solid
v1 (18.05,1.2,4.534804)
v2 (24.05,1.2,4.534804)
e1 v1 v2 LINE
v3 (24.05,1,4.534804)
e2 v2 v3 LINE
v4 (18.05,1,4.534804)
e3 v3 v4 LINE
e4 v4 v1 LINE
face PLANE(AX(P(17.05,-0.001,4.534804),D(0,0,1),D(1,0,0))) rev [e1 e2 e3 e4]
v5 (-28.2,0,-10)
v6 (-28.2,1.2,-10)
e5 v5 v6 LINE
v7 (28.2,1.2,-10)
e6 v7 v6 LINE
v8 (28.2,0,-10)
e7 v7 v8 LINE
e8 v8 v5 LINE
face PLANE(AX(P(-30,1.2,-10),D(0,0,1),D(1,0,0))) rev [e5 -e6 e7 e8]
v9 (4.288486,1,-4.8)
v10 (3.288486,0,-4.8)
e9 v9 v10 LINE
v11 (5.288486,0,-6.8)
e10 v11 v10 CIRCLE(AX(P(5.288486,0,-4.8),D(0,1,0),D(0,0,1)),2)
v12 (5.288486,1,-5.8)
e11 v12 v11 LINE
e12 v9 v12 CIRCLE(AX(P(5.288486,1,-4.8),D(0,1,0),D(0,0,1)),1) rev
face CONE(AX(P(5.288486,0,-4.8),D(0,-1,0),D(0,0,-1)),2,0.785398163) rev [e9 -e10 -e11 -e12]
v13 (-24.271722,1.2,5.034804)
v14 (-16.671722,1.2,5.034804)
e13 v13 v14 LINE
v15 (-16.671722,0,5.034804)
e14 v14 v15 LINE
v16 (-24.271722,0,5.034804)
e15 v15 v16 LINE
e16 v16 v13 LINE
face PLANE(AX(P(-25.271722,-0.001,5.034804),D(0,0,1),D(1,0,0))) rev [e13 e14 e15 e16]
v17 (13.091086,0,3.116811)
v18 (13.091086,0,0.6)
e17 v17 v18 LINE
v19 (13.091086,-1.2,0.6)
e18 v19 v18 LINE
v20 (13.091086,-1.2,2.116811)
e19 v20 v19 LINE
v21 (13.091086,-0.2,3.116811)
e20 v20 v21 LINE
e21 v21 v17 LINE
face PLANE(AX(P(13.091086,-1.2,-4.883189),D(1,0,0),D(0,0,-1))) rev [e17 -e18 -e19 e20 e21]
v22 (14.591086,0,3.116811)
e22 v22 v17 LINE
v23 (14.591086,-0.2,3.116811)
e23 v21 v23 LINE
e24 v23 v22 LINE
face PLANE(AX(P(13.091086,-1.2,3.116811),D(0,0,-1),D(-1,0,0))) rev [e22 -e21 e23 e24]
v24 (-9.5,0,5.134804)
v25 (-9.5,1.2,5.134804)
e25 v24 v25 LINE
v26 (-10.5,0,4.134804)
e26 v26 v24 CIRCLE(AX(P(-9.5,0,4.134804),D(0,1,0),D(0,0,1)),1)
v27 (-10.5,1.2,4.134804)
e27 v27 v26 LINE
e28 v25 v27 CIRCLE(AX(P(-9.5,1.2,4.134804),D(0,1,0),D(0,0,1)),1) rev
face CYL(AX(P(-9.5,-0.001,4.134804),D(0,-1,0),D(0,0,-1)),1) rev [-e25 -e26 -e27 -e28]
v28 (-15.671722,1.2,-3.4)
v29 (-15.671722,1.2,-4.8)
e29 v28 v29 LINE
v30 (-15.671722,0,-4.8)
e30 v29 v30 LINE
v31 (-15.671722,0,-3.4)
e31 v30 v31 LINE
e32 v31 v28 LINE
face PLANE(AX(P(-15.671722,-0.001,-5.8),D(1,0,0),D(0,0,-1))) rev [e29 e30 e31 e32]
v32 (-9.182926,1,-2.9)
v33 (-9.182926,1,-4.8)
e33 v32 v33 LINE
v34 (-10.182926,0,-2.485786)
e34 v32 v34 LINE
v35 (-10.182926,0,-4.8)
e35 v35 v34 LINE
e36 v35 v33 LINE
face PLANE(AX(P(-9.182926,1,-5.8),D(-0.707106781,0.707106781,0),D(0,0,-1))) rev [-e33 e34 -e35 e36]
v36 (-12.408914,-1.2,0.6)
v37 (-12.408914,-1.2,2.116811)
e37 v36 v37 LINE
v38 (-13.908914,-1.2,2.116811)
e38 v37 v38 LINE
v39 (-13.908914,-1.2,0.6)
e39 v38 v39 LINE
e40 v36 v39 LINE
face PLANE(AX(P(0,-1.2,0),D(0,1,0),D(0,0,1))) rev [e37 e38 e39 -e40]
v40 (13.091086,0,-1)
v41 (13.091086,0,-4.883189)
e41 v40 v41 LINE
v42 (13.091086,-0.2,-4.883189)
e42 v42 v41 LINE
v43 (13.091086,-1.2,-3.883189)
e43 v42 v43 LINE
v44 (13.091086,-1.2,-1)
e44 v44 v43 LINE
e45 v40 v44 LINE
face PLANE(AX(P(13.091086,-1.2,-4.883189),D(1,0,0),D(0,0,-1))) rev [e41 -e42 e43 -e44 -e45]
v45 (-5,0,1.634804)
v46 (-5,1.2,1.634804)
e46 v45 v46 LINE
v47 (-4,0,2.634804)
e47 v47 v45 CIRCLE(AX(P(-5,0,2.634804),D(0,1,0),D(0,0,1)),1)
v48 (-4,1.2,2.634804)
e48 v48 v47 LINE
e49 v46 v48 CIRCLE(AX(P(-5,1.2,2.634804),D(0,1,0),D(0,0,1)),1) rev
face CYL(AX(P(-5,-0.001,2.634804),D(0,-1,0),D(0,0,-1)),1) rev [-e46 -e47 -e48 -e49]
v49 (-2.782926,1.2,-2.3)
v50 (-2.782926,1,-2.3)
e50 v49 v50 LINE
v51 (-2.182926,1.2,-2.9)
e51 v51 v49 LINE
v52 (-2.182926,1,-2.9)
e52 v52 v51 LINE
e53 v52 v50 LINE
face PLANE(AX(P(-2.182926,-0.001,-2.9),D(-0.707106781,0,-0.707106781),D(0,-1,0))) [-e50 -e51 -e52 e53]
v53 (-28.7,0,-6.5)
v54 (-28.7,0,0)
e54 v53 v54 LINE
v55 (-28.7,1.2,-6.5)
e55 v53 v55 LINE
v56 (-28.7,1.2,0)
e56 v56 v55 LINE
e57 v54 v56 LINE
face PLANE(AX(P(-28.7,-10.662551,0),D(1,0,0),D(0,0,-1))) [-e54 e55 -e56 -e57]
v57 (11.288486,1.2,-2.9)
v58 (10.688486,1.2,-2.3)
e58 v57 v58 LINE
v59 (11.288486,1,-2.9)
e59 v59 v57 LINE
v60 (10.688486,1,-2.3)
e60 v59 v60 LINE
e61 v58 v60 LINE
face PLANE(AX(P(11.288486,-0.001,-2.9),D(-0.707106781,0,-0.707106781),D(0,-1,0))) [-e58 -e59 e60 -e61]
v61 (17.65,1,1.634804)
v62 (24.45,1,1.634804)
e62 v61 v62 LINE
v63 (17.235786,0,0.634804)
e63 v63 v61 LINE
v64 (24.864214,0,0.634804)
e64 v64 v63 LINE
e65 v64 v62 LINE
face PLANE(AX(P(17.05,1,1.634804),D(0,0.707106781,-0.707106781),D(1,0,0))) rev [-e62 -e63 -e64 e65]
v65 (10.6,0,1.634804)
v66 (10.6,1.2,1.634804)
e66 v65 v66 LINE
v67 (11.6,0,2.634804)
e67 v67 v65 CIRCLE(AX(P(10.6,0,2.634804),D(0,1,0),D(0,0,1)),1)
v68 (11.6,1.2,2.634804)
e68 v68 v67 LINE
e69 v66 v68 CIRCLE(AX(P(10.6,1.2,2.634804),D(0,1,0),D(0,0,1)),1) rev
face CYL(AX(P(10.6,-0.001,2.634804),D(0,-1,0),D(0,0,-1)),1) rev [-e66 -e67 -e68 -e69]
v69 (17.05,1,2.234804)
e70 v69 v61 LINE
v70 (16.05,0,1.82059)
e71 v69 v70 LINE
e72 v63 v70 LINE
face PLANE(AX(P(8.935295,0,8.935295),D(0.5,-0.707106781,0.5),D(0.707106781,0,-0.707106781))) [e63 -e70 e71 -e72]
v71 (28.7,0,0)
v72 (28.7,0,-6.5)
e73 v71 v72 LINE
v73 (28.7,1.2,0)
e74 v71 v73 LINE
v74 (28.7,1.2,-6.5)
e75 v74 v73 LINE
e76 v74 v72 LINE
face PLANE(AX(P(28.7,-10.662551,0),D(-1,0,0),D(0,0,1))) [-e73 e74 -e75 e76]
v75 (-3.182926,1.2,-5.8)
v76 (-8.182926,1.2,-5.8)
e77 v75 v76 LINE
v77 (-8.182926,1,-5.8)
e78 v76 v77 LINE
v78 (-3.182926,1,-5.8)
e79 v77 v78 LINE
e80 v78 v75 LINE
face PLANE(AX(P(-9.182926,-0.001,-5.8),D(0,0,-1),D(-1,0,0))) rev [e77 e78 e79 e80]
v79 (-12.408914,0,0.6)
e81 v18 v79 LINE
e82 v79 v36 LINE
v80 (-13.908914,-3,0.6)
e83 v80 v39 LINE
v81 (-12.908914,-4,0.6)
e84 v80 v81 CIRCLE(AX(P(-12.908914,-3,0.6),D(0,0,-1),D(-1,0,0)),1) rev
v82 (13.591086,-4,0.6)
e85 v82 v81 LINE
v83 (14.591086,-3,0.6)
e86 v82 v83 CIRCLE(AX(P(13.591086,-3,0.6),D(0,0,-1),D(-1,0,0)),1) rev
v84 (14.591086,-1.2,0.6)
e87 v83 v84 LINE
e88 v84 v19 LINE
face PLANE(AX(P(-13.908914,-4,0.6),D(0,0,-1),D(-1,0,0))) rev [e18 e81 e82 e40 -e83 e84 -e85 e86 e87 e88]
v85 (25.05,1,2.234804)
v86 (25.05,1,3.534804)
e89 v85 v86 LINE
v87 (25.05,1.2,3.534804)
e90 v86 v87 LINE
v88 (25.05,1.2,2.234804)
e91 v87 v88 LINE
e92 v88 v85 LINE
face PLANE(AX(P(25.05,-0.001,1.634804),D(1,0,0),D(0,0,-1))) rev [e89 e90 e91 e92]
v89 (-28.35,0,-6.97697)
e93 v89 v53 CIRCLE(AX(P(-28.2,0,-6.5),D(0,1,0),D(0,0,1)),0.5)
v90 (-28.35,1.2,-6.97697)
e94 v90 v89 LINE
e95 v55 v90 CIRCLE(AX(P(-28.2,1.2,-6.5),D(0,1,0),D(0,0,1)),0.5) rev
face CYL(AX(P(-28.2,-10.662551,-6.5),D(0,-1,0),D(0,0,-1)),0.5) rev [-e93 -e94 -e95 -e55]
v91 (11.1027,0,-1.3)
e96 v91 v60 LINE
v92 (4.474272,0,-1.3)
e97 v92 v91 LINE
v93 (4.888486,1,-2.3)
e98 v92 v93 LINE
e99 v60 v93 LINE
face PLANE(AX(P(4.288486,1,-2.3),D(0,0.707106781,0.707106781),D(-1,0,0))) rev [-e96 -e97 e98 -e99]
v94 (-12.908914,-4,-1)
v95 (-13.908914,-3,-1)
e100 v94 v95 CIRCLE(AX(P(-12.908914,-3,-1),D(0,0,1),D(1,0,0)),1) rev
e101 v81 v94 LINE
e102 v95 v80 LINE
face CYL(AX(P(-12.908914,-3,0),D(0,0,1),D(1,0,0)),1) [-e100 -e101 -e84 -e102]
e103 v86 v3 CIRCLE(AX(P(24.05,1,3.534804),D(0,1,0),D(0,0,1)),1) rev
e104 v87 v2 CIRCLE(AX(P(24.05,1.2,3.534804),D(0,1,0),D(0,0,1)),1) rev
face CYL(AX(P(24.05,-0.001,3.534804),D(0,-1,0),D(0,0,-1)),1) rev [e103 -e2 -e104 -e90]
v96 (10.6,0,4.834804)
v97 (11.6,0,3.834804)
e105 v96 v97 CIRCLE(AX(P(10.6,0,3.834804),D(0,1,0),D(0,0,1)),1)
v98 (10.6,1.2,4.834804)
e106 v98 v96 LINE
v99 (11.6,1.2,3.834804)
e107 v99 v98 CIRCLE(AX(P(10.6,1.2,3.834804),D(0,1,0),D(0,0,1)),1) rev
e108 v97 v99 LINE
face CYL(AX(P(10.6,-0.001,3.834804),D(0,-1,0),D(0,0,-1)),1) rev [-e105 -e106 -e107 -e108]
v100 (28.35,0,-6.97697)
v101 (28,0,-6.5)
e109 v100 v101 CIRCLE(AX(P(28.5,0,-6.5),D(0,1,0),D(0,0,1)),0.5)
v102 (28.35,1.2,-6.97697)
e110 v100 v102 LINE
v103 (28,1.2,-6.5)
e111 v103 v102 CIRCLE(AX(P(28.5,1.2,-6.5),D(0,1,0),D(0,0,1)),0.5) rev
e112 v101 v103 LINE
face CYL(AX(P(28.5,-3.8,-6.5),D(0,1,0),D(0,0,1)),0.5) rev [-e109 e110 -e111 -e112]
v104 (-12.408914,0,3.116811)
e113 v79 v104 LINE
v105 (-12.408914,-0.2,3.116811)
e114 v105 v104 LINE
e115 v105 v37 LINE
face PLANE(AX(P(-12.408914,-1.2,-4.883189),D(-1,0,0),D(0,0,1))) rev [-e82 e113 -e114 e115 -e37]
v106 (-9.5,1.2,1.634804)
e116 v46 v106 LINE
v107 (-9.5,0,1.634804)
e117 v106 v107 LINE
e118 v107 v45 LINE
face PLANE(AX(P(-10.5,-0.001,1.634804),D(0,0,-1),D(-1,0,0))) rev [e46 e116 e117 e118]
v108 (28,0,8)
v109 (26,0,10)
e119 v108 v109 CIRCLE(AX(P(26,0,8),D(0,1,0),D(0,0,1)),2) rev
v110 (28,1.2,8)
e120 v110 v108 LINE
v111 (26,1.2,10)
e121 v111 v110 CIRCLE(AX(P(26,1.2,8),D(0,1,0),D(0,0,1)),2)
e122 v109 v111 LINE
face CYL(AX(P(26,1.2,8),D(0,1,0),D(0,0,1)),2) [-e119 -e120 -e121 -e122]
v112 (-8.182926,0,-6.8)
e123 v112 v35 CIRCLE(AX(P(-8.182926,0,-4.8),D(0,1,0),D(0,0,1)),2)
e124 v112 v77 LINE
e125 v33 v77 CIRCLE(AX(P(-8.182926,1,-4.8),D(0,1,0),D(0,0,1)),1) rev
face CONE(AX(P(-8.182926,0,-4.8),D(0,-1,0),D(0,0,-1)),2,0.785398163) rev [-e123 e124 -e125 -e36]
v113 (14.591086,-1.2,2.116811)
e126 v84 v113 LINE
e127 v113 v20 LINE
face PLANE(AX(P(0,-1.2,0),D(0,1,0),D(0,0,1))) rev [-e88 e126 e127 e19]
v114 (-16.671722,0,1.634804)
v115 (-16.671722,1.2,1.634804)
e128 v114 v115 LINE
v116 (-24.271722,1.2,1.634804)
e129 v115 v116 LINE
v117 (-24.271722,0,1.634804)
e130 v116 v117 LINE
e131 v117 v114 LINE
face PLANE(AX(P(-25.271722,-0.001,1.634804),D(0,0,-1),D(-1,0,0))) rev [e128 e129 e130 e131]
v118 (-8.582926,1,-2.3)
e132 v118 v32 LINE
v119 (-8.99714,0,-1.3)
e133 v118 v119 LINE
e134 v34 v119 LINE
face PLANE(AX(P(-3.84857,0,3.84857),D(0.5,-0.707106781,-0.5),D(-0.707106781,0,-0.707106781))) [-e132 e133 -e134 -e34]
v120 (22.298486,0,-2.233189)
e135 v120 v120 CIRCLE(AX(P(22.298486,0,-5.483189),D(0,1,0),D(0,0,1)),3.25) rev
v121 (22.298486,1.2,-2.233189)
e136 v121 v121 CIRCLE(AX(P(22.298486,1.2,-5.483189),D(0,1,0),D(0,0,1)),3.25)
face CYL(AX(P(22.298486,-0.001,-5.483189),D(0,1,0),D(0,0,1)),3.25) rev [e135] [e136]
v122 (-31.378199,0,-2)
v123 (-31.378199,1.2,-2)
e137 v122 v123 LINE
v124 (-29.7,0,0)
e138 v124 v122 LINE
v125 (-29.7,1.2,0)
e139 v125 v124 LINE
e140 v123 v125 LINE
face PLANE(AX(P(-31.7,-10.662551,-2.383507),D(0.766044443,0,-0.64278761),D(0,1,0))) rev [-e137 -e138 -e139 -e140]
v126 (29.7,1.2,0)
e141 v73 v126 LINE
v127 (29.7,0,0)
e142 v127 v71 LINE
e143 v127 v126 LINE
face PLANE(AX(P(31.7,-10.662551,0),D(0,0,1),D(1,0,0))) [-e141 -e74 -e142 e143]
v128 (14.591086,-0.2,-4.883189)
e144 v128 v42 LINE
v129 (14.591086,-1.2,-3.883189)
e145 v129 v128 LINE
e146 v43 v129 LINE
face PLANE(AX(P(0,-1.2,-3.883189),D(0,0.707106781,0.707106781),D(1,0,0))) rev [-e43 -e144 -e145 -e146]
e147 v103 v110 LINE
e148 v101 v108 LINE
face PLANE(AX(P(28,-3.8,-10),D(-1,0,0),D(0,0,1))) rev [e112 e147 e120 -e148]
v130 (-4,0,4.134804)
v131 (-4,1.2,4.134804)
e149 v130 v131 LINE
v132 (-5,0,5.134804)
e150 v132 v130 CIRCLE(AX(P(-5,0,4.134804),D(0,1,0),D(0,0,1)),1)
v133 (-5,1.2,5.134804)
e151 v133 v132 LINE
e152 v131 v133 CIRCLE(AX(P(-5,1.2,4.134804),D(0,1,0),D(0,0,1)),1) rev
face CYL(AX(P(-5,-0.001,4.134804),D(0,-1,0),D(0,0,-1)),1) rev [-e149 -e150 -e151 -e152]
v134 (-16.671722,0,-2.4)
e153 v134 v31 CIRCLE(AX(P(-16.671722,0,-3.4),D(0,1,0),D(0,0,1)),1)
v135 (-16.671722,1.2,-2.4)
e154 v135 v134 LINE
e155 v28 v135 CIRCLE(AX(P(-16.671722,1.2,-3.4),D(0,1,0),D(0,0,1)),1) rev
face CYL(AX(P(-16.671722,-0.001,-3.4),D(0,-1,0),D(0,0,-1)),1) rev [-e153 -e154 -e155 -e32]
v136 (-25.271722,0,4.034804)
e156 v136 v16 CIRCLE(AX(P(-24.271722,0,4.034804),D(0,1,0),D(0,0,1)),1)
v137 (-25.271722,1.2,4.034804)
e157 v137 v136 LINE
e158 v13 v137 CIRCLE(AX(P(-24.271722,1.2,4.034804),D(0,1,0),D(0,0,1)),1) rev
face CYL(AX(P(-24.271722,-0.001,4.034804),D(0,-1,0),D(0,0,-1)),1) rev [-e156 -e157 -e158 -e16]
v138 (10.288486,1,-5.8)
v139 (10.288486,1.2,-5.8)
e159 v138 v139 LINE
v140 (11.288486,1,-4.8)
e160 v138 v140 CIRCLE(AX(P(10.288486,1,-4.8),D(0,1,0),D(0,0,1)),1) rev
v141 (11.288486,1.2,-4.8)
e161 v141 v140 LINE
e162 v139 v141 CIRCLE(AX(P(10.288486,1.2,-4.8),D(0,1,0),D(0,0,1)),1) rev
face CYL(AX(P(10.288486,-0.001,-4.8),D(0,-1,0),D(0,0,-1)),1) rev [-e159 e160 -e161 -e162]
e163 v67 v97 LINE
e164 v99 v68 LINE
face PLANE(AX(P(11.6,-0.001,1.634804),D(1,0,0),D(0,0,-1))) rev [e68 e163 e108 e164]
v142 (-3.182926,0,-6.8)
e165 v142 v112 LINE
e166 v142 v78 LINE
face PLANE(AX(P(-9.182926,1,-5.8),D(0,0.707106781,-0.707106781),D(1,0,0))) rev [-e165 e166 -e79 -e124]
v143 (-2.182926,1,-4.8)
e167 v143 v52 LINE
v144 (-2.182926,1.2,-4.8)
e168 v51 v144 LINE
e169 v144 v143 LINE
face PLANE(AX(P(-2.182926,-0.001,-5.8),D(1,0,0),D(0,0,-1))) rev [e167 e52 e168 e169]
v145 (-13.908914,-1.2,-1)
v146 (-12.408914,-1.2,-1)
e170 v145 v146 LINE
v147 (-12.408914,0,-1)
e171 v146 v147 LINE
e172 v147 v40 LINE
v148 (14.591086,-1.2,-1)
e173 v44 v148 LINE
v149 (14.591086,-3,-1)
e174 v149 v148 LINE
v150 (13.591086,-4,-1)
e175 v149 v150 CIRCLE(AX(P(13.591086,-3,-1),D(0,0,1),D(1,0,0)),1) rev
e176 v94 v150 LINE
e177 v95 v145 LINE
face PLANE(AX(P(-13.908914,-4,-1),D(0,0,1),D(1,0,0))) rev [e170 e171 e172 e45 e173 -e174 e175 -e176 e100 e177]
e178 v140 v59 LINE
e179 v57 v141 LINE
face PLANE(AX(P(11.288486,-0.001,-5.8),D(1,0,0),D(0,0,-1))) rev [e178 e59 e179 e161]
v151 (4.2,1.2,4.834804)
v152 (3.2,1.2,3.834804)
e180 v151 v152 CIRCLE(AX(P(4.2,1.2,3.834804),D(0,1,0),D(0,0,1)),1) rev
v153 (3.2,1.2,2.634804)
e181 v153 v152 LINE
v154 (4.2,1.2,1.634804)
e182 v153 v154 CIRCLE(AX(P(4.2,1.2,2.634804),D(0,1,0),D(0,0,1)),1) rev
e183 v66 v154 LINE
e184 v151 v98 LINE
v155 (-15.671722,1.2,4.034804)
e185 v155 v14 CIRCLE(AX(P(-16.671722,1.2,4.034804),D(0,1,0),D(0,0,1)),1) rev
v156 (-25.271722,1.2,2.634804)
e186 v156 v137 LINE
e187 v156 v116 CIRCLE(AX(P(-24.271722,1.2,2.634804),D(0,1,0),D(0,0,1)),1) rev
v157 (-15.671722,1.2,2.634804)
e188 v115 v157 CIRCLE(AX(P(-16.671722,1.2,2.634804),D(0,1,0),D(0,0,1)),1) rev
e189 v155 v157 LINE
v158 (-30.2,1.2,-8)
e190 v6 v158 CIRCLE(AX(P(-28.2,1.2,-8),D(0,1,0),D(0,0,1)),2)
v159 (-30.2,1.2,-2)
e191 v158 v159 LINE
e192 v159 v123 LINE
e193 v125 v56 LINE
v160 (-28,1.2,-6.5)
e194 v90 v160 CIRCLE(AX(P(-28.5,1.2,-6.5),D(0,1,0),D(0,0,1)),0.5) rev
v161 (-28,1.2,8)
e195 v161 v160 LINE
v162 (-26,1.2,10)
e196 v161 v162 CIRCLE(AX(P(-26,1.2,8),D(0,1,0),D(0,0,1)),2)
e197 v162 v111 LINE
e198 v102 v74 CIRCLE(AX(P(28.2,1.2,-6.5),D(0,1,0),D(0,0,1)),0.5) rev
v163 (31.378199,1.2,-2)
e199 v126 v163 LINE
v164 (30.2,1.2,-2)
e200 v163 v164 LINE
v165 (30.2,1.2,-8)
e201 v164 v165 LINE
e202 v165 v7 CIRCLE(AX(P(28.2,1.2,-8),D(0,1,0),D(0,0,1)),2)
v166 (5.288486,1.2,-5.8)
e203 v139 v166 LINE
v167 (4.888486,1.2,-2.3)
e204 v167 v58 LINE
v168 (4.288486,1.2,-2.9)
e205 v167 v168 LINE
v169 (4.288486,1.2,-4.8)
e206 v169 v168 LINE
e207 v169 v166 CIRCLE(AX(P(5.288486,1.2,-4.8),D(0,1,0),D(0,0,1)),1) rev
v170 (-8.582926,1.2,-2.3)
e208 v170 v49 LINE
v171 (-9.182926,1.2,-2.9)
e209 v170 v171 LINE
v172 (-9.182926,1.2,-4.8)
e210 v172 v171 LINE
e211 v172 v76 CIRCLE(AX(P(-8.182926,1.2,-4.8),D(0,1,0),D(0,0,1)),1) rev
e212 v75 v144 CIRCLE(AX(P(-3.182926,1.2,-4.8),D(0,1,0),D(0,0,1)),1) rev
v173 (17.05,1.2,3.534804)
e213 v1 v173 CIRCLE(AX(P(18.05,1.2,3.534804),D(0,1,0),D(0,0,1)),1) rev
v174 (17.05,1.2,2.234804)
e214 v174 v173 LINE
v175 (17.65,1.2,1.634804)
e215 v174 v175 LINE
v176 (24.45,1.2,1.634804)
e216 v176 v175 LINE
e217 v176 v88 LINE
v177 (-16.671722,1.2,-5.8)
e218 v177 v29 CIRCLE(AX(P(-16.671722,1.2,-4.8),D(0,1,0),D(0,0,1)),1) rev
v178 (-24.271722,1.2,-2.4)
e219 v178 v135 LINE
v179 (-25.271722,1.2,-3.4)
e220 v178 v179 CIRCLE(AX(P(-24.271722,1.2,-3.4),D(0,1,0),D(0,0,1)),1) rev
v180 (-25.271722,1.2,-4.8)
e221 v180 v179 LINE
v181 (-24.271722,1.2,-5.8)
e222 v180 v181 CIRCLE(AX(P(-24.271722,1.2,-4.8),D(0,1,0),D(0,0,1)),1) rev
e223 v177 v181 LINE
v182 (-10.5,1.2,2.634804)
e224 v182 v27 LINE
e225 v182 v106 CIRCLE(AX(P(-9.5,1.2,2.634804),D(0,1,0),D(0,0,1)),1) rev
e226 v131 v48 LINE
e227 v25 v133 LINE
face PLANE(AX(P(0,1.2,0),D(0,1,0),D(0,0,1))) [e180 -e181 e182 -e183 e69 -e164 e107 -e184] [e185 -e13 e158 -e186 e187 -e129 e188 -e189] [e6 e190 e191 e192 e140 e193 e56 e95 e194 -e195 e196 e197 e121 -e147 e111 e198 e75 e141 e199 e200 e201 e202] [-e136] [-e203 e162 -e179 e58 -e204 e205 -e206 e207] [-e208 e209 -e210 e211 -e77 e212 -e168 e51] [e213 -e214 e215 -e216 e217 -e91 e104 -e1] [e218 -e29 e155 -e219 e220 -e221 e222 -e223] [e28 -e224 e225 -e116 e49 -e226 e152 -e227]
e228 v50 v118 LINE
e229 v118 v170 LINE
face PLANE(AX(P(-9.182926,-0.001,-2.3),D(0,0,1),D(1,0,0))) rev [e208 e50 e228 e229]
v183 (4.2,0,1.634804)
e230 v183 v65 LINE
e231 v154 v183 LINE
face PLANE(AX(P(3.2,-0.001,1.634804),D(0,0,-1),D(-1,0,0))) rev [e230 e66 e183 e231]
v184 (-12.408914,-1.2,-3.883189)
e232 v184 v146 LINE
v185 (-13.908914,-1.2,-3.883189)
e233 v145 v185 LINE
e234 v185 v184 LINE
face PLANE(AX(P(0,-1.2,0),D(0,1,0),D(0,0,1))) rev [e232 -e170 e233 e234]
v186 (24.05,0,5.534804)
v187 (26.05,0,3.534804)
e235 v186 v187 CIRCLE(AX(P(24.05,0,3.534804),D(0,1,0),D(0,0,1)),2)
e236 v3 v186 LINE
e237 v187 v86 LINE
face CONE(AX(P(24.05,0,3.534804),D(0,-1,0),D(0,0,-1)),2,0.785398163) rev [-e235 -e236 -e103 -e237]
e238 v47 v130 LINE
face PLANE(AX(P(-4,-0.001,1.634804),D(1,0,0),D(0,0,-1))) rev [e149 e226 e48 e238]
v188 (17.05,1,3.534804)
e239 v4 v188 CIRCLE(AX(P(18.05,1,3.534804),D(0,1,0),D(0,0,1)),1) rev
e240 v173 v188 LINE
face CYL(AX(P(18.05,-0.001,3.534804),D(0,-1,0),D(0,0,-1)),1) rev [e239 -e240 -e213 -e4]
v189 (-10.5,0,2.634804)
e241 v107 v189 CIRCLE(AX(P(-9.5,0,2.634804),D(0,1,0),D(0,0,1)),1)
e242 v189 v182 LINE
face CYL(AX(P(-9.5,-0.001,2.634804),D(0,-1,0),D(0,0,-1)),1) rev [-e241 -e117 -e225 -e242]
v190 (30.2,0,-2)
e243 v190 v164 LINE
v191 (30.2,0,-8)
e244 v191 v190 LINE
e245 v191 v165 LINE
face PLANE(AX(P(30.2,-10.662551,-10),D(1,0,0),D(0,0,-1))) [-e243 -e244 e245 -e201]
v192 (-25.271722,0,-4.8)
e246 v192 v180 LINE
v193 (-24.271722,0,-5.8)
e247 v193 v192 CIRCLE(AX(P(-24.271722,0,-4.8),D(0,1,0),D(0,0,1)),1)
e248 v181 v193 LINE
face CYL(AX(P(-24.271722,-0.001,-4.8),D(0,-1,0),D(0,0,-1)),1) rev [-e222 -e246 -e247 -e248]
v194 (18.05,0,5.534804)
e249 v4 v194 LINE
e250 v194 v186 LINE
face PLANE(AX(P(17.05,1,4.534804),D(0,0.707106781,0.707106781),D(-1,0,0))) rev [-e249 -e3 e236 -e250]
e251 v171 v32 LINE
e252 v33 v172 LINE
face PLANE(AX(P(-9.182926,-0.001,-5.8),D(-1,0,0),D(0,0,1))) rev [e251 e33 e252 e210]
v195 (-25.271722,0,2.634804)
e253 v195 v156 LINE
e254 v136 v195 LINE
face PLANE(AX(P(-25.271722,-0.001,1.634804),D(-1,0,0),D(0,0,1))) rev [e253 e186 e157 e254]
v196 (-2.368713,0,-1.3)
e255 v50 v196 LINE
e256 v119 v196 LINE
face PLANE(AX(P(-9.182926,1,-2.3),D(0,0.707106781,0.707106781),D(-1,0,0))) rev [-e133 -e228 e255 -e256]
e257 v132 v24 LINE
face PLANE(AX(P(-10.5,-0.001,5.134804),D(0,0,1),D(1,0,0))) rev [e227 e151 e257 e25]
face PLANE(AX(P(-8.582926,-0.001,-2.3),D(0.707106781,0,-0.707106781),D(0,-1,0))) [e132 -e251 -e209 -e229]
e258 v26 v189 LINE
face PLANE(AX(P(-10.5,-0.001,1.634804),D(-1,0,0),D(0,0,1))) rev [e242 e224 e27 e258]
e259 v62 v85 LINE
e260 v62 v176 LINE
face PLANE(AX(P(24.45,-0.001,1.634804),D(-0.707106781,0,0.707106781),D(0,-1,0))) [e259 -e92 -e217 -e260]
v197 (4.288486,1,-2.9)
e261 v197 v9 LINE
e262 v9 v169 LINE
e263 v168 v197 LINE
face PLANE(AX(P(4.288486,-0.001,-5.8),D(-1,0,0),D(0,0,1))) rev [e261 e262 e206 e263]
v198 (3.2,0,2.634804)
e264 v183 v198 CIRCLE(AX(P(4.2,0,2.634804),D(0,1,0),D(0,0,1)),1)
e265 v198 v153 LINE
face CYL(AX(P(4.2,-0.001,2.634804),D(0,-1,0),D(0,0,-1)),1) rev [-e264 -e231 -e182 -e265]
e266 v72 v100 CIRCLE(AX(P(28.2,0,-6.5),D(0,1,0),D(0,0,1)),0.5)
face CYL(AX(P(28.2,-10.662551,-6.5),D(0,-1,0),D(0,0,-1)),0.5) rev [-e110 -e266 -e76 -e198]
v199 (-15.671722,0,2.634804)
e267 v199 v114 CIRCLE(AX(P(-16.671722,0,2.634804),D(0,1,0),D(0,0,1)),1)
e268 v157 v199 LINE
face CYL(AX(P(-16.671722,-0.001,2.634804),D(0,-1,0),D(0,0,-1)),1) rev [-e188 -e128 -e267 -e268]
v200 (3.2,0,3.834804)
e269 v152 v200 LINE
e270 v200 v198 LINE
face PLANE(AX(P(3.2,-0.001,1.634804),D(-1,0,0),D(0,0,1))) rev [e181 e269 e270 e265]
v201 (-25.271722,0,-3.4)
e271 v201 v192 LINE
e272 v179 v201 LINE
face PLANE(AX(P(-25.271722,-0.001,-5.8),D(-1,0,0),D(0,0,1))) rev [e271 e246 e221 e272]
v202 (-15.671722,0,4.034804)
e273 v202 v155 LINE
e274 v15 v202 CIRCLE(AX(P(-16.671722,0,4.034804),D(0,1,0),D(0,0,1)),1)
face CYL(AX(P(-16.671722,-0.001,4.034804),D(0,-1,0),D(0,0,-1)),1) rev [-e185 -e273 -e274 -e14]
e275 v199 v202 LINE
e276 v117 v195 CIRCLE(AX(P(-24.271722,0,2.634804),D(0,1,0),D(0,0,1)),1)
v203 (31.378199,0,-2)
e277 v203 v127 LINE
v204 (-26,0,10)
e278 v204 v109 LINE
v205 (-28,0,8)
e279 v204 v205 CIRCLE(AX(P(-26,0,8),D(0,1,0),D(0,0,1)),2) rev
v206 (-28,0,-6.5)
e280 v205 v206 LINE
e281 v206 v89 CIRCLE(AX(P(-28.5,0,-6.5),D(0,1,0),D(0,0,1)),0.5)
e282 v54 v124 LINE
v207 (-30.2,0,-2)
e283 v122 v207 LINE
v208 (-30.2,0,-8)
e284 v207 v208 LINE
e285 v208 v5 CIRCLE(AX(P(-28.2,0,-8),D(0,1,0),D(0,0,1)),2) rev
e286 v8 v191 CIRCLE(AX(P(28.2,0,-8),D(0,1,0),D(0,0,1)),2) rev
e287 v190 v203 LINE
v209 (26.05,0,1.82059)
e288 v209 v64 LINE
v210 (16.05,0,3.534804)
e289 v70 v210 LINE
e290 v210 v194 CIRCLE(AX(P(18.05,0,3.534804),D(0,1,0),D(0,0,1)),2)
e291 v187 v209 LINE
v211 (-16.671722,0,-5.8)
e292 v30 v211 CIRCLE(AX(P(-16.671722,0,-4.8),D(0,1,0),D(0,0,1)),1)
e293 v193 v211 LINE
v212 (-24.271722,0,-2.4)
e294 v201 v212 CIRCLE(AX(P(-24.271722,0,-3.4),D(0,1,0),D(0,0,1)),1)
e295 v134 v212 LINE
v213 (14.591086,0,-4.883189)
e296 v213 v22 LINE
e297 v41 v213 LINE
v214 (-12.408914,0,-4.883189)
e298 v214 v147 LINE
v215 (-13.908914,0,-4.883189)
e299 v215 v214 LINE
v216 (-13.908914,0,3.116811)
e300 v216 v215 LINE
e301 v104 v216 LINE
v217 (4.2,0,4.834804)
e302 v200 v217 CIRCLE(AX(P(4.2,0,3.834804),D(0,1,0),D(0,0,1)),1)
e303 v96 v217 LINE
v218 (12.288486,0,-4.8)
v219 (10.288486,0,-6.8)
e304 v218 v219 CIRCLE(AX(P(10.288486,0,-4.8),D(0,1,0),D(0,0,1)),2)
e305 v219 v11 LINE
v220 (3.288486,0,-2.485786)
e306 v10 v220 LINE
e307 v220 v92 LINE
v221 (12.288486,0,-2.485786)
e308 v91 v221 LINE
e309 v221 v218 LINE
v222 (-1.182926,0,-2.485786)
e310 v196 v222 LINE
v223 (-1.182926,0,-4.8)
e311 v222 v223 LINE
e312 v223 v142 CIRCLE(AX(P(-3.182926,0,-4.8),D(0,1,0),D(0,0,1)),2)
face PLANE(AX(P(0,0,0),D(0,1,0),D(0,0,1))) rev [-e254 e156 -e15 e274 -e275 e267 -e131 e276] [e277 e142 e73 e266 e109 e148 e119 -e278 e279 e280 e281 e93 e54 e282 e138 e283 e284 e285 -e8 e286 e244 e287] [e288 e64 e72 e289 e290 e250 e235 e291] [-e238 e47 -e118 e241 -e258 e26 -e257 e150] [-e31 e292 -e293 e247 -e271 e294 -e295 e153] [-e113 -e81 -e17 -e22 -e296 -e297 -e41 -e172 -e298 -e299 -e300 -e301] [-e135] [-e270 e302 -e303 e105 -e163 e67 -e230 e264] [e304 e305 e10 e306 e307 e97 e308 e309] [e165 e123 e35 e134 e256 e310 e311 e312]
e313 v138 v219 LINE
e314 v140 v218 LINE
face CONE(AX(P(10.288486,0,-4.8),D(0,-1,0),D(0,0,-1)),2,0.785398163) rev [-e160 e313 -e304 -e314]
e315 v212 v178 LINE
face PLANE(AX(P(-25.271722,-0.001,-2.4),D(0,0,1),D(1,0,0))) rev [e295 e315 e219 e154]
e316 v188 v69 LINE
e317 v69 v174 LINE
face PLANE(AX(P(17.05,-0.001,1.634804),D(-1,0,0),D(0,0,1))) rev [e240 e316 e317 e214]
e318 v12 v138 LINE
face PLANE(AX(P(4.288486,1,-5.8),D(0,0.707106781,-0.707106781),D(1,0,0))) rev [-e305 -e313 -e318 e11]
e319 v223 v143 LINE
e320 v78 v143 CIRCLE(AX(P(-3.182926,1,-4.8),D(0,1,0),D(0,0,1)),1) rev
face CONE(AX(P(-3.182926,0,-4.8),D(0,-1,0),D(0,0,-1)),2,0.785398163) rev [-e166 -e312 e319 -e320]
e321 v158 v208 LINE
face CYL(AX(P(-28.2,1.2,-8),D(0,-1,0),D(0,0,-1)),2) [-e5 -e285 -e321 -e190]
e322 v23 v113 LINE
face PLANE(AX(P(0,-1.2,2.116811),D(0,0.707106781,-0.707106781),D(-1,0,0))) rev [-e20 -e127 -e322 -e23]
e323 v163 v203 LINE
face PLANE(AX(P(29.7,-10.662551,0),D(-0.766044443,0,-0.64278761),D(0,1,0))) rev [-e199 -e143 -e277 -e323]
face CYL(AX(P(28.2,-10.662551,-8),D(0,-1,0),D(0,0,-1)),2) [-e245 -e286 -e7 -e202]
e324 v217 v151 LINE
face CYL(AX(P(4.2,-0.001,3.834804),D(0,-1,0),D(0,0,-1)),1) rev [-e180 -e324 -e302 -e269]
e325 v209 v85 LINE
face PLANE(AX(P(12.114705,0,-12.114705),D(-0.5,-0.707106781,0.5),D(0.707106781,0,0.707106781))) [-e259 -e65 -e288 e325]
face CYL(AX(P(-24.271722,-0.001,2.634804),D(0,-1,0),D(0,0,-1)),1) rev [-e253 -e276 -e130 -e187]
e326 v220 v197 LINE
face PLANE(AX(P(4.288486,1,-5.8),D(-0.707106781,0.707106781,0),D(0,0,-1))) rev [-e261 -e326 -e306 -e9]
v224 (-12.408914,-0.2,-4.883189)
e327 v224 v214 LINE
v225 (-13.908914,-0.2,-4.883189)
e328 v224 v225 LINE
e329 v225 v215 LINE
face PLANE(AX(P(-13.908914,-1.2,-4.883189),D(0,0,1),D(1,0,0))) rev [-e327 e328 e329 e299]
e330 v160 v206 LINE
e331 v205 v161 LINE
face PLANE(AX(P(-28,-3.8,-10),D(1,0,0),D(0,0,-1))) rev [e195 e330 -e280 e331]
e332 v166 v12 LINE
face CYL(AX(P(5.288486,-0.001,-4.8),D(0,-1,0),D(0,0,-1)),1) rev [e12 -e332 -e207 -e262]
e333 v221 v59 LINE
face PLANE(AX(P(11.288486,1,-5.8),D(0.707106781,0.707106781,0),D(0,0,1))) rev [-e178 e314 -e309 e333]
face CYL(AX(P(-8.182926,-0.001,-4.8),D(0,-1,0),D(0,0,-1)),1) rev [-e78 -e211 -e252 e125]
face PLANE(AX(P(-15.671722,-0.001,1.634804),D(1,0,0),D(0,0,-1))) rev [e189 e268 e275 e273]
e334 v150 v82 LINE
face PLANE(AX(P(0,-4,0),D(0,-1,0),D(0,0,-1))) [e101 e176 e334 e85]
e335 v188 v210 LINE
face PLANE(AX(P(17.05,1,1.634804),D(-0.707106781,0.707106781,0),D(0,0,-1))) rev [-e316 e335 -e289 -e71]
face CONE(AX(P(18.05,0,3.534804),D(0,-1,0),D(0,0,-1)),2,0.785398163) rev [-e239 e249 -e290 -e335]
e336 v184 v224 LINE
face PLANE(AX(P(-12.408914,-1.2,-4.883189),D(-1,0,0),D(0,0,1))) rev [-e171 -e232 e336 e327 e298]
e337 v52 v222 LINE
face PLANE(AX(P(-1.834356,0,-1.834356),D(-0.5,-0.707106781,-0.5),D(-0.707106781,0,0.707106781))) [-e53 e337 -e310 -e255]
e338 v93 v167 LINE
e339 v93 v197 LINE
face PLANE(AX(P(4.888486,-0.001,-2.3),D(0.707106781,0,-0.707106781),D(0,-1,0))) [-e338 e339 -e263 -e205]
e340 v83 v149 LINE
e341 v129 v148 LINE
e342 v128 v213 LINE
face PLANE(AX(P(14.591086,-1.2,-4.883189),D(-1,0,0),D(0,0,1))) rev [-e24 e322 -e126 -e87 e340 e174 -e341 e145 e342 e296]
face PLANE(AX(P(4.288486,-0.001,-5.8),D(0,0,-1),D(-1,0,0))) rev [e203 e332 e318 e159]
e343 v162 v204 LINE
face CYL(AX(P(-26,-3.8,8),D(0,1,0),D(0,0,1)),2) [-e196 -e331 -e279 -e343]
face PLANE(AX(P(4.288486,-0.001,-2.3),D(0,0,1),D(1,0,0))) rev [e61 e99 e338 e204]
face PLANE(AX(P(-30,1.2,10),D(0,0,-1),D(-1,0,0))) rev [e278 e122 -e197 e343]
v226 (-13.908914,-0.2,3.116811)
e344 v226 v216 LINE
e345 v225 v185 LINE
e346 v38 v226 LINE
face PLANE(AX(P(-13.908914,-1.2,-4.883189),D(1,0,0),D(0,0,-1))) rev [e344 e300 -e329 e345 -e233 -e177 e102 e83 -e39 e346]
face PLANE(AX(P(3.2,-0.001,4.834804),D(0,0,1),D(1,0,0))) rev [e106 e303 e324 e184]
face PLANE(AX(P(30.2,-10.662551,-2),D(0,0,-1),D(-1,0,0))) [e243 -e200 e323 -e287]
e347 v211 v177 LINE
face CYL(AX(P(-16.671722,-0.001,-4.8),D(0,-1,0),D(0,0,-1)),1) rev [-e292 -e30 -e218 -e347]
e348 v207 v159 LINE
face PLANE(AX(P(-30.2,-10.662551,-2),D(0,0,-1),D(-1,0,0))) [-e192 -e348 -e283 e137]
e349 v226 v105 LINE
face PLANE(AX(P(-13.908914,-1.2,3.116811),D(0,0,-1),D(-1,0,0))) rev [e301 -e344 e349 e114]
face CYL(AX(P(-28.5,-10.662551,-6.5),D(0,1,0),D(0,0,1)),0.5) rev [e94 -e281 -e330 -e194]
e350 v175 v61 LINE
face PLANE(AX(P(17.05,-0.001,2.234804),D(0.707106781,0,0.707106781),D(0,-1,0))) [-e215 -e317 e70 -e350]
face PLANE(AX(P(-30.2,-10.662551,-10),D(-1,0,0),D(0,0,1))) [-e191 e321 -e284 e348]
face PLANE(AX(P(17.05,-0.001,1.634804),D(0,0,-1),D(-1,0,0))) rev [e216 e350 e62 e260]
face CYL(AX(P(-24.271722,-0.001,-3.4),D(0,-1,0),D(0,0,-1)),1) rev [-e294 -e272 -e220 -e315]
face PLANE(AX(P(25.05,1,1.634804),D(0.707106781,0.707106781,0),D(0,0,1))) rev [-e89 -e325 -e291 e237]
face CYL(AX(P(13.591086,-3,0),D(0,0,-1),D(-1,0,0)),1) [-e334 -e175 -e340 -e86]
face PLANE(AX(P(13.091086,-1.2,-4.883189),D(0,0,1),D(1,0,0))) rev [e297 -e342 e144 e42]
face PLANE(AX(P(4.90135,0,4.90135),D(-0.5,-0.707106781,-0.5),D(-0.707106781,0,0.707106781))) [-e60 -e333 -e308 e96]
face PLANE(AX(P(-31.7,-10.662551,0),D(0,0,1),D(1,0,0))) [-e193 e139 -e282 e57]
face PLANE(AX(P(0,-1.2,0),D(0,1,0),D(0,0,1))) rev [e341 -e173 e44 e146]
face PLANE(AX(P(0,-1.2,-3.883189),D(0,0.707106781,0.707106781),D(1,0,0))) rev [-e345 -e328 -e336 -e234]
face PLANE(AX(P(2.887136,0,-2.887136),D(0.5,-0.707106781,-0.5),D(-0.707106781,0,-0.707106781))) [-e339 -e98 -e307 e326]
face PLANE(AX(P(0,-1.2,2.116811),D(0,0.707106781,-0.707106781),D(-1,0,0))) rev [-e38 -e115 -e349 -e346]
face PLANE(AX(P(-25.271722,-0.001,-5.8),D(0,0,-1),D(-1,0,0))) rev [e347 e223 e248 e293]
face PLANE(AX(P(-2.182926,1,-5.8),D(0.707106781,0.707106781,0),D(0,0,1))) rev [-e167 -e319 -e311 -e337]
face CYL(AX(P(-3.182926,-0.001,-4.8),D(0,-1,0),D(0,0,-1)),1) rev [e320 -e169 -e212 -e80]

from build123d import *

# Parameters (mm, degrees)
SKETCH_1_W          = 60
SKETCH_1_H          = 20
EXTRUDE_1_DEPTH     = 1.2
CUT_EXTRUDE_1_REACH = 33.646
SKETCH_4_R          = 3.25
SKETCH_4_W          = 9.6
SKETCH_4_H          = 3.4
SKETCH_4_W_2        = 7
SKETCH_4_H_2        = 3.5
SKETCH_4_W_3        = 8
SKETCH_4_H_3        = 2.9
SKETCH_4_W_4        = 8.4
SKETCH_4_H_4        = 3.2
SKETCH_4_W_5        = 6.5
FILLET_2_R          = 1
CHAMFER_1_SIZE      = 0.6
SKETCH_5_W          = 1.5
SKETCH_5_H          = 8
EXTRUDE_2_DEPTH     = 1.2
SKETCH_6_W          = 28.5
SKETCH_6_H          = 1.6
EXTRUDE_3_DEPTH     = 4
FILLET_3_R          = 1
CHAMFER_2_SIZE      = 1
CHAMFER_4_SIZE      = 1
SKETCH_7_W          = 2
SKETCH_7_H          = 20
CUT_EXTRUDE_2_DEPTH = 5
EXTRUDE_5_DEPTH     = 1.2
FILLET_5_R          = 2
FILLET_6_R          = 0.5
CHAMFER_5_SIZE      = 2
CHAMFER_5_SIZE_2    = 2.383507185
CHAMFER_6_SIZE      = 2
CHAMFER_6_SIZE_2    = 2.383507185


with BuildPart() as part:
    # 草图1 → 凸台-拉伸1 (new body)
    with BuildSketch(Plane(origin=(0, 0, 0), x_dir=(1, 0, 0), z_dir=(0, 1, 0))):
        Rectangle(SKETCH_1_W, SKETCH_1_H)
    extrude(amount=EXTRUDE_1_DEPTH)

    # 草图4 → 切除-拉伸1 (cut, up to next)
    with BuildSketch(Plane(origin=(0, 1.2, 0), x_dir=(1, 0, 0), z_dir=(0, 1, 0)), mode=Mode.PRIVATE) as cut_extrude_1_sk1:
        with Locations(Location((22.298485985, 5.48318929, 0), (0, 0, 270))):
            Circle(SKETCH_4_R)
    cut_extrude_1_tool1 = extrude(cut_extrude_1_sk1.sketch, amount=-CUT_EXTRUDE_1_REACH, mode=Mode.PRIVATE) & part.part
    # 草图4 → 切除-拉伸1 (cut, up to next)
    with BuildSketch(Plane(origin=(0, 1.2, 0), x_dir=(1, 0, 0), z_dir=(0, 1, 0)), mode=Mode.PRIVATE) as cut_extrude_1_sk2:
        with Locations((-20.471722325, 4.1)):
            Rectangle(SKETCH_4_W, SKETCH_4_H)
    cut_extrude_1_tool2 = extrude(cut_extrude_1_sk2.sketch, amount=-CUT_EXTRUDE_1_REACH, mode=Mode.PRIVATE) & part.part
    # 草图4 → 切除-拉伸1 (cut, up to next)
    with BuildSketch(Plane(origin=(0, 1.2, 0), x_dir=(1, 0, 0), z_dir=(0, 1, 0)), mode=Mode.PRIVATE) as cut_extrude_1_sk3:
        with Locations((-5.682926277, 4.05)):
            Rectangle(SKETCH_4_W_2, SKETCH_4_H_2)
    cut_extrude_1_tool3 = extrude(cut_extrude_1_sk3.sketch, amount=-CUT_EXTRUDE_1_REACH, mode=Mode.PRIVATE) & part.part
    # 草图4 → 切除-拉伸1 (cut, up to next)
    with BuildSketch(Plane(origin=(0, 1.2, 0), x_dir=(1, 0, 0), z_dir=(0, 1, 0)), mode=Mode.PRIVATE) as cut_extrude_1_sk4:
        with Locations((7.788485985, 4.05)):
            Rectangle(SKETCH_4_W_2, SKETCH_4_H_2)
    cut_extrude_1_tool4 = extrude(cut_extrude_1_sk4.sketch, amount=-CUT_EXTRUDE_1_REACH, mode=Mode.PRIVATE) & part.part
    # 草图4 → 切除-拉伸1 (cut, up to next)
    with BuildSketch(Plane(origin=(0, 1.2, 0), x_dir=(1, 0, 0), z_dir=(0, 1, 0)), mode=Mode.PRIVATE) as cut_extrude_1_sk5:
        with Locations((21.05, -3.084803861)):
            Rectangle(SKETCH_4_W_3, SKETCH_4_H_3)
    cut_extrude_1_tool5 = extrude(cut_extrude_1_sk5.sketch, amount=-CUT_EXTRUDE_1_REACH, mode=Mode.PRIVATE) & part.part
    # 草图4 → 切除-拉伸1 (cut, up to next)
    with BuildSketch(Plane(origin=(0, 1.2, 0), x_dir=(1, 0, 0), z_dir=(0, 1, 0)), mode=Mode.PRIVATE) as cut_extrude_1_sk6:
        with Locations((7.4, -3.234803861)):
            Rectangle(SKETCH_4_W_4, SKETCH_4_H_4)
    cut_extrude_1_tool6 = extrude(cut_extrude_1_sk6.sketch, amount=-CUT_EXTRUDE_1_REACH, mode=Mode.PRIVATE) & part.part
    # 草图4 → 切除-拉伸1 (cut, up to next)
    with BuildSketch(Plane(origin=(0, 1.2, 0), x_dir=(1, 0, 0), z_dir=(0, 1, 0)), mode=Mode.PRIVATE) as cut_extrude_1_sk7:
        with Locations((-7.25, -3.384803861)):
            Rectangle(SKETCH_4_W_5, SKETCH_4_H_2)
    cut_extrude_1_tool7 = extrude(cut_extrude_1_sk7.sketch, amount=-CUT_EXTRUDE_1_REACH, mode=Mode.PRIVATE) & part.part
    # 草图4 → 切除-拉伸1 (cut, up to next)
    with BuildSketch(Plane(origin=(0, 1.2, 0), x_dir=(1, 0, 0), z_dir=(0, 1, 0)), mode=Mode.PRIVATE) as cut_extrude_1_sk8:
        with Locations((-20.471722325, -3.334803861)):
            Rectangle(SKETCH_4_W, SKETCH_4_H)
    cut_extrude_1_tool8 = extrude(cut_extrude_1_sk8.sketch, amount=-CUT_EXTRUDE_1_REACH, mode=Mode.PRIVATE) & part.part
    add(cut_extrude_1_tool1.solids().sort_by_distance((22.298486, 1.2, -5.483189))[0], mode=Mode.SUBTRACT)
    add(cut_extrude_1_tool2.solids().sort_by_distance((-20.471722, 1.2, -4.1))[0], mode=Mode.SUBTRACT)
    add(cut_extrude_1_tool3.solids().sort_by_distance((-5.682926, 1.2, -4.05))[0], mode=Mode.SUBTRACT)
    add(cut_extrude_1_tool4.solids().sort_by_distance((7.788486, 1.2, -4.05))[0], mode=Mode.SUBTRACT)
    add(cut_extrude_1_tool5.solids().sort_by_distance((21.05, 1.2, 3.084804))[0], mode=Mode.SUBTRACT)
    add(cut_extrude_1_tool6.solids().sort_by_distance((7.4, 1.2, 3.234804))[0], mode=Mode.SUBTRACT)
    add(cut_extrude_1_tool7.solids().sort_by_distance((-7.25, 1.2, 3.384804))[0], mode=Mode.SUBTRACT)
    add(cut_extrude_1_tool8.solids().sort_by_distance((-20.471722, 1.2, 3.334804))[0], mode=Mode.SUBTRACT)

    # 圆角2
    fillet_2_edges = [part.edges().sort_by_distance(p)[0] for p in [
        (-9.182926277, 0.6, -5.8),
        (-2.182926277, 0.6, -5.8),
        (4.288485985, 0.6, -5.8),
        (11.288485985, 0.6, -5.8),
        (17.05, 0.6, 4.534803861),
        (25.05, 0.6, 4.534803861),
        (3.2, 0.6, 4.834803861),
        (3.2, 0.6, 1.634803861),
        (11.6, 0.6, 1.634803861),
        (11.6, 0.6, 4.834803861),
        (-10.5, 0.6, 5.134803861),
        (-10.5, 0.6, 1.634803861),
        (-4, 0.6, 1.634803861),
        (-4, 0.6, 5.134803861),
        (-25.271722325, 0.6, 5.034803861),
        (-25.271722325, 0.6, 1.634803861),
        (-15.671722325, 0.6, 1.634803861),
        (-15.671722325, 0.6, 5.034803861),
        (-25.271722325, 0.6, -2.4),
        (-25.271722325, 0.6, -5.8),
        (-15.671722325, 0.6, -5.8),
        (-15.671722325, 0.6, -2.4),
    ]]
    fillet(fillet_2_edges, radius=FILLET_2_R)

    # 倒角1
    chamfer_1_edges = [part.edges().sort_by_distance(p)[0] for p in [
        (-9.182926277, 0.6, -2.3),
        (-2.182926277, 0.6, -2.3),
        (4.288485985, 0.6, -2.3),
        (11.288485985, 0.6, -2.3),
        (17.05, 0.6, 1.634803861),
        (25.05, 0.6, 1.634803861),
    ]]
    chamfer(chamfer_1_edges, length=CHAMFER_1_SIZE)

    # 草图5 → 凸台-拉伸2 (add)
    with BuildSketch(Plane.XZ):
        with Locations((-13.15891381, -0.88318929)):
            Rectangle(SKETCH_5_W, SKETCH_5_H)
        with Locations((13.84108619, -0.88318929)):
            Rectangle(SKETCH_5_W, SKETCH_5_H)
    extrude(amount=EXTRUDE_2_DEPTH)

    # 草图6 → 凸台-拉伸3 (add)
    with BuildSketch(Plane.XZ):
        with Locations((0.34108619, -0.2)):
            Rectangle(SKETCH_6_W, SKETCH_6_H)
    extrude(amount=EXTRUDE_3_DEPTH)

    # 圆角3
    fillet_3_edges = [part.edges().sort_by_distance(p)[0] for p in [
        (-13.90891381, -4, -0.2),
        (14.59108619, -4, -0.2),
    ]]
    fillet(fillet_3_edges, radius=FILLET_3_R)

    # 倒角2
    chamfer_2_edges = [part.edges().sort_by_distance(p)[0] for p in [
        (-13.15891381, -1.2, -4.88318929),
        (-13.15891381, -1.2, 3.11681071),
        (13.84108619, -1.2, -4.88318929),
        (13.84108619, -1.2, 3.11681071),
    ]]
    chamfer(chamfer_2_edges, length=CHAMFER_2_SIZE)

    # 倒角4
    chamfer_4_edges = [part.edges().sort_by_distance(p)[0] for p in [
        (-5.682926277, 0, -5.8),
        (-2.182926277, 0, -3.85),
        (7.788485985, 0, -5.8),
        (11.288485985, 0, -3.85),
        (21.05, 0, 4.534803861),
        (17.05, 0, 2.884803861),
        (-2.475819496, 0, -5.507106781),
        (-8.890033058, 0, -5.507106781),
        (4.581379204, 0, -5.507106781),
        (10.995592766, 0, -5.507106781),
        (24.757106781, 0, 4.241910642),
        (17.342893219, 0, 4.241910642),
        (-5.682926277, 0, -2.3),
        (-9.182926277, 0, -3.85),
        (7.788485985, 0, -2.3),
        (4.288485985, 0, -3.85),
        (21.05, 0, 1.634803861),
        (25.05, 0, 2.884803861),
        (-8.882926277, 0, -2.6),
        (-2.482926277, 0, -2.6),
        (4.588485985, 0, -2.6),
        (10.988485985, 0, -2.6),
        (17.35, 0, 1.934803861),
        (24.75, 0, 1.934803861),
    ]]
    chamfer(chamfer_4_edges, length=CHAMFER_4_SIZE)

    # 草图7 → 切除-拉伸2 (cut)
    with BuildSketch(Plane(origin=(0, 1.2, 0), x_dir=(1, 0, 0), z_dir=(0, 1, 0))):
        with Locations((29, 0)):
            Rectangle(SKETCH_7_W, SKETCH_7_H)
        with Locations((-29, 0)):
            Rectangle(SKETCH_7_W, SKETCH_7_H)
    extrude(amount=-CUT_EXTRUDE_2_DEPTH, mode=Mode.SUBTRACT)

    # 草图11 → 凸台-拉伸5 (add)
    with BuildSketch(Plane(origin=(0, 1.2, 0), x_dir=(1, 0, 0), z_dir=(0, 1, 0))):
        Polygon((28, 10), (30.2, 10), (30.2, 2), (31.7, 2), (31.7, 0), (28.7, 0), (28.7, 7), (28, 7), align=None)
        Polygon((-28, 10), (-30.2, 10), (-30.2, 2), (-31.7, 2), (-31.7, 0), (-28.7, 0), (-28.7, 7), (-28, 7), align=None)
    extrude(amount=-EXTRUDE_5_DEPTH)

    # 圆角5
    fillet_5_edges = [part.edges().sort_by_distance(p)[0] for p in [
        (28, 0.6, 10),
        (-28, 0.6, 10),
        (30.2, 0.6, -10),
        (-30.2, 0.6, -10),
    ]]
    fillet(fillet_5_edges, radius=FILLET_5_R)

    # 圆角6
    # the kernel refuses this fillet: 0.5 mm, written as the material it adds along each edge
    with BuildSketch(Plane(origin=(28, 1.2, -7), x_dir=(0, 0, 1), z_dir=(0, -1, 0)), Plane(origin=(28.7, 1.2, -7), x_dir=(-1, 0, 0), z_dir=(0, -1, 0))) as fillet_6_piece_1:
        with BuildLine():
            CenterArc((FILLET_6_R, -FILLET_6_R), FILLET_6_R, 90, 90)
            Line((0, -FILLET_6_R), (0, 0))
            Line((0, 0), (FILLET_6_R, 0))
        make_face()
    extrude(amount=1.2)
    with BuildSketch(Plane(origin=(-28, 1.2, -7), x_dir=(0, 0, 1), z_dir=(0, -1, 0)), Plane(origin=(-28.7, 1.2, -7), x_dir=(1, 0, 0), z_dir=(0, -1, 0))) as fillet_6_piece_2:
        with BuildLine():
            CenterArc((FILLET_6_R, FILLET_6_R), FILLET_6_R, 180, 90)
            Line((0, FILLET_6_R), (0, 0))
            Line((0, 0), (FILLET_6_R, 0))
        make_face()
    extrude(amount=1.2)

    # 倒角5
    # the kernel refuses this chamfer: 2.383507185, 2 mm, written as the material it takes off along each edge
    with BuildSketch(Plane(origin=(31.7, 7.343265966, 0), x_dir=(-0.9993728857116148, 0, 0.03540953691366325), z_dir=(0, -1, 0))) as chamfer_5_piece_1:
        Polygon((CHAMFER_5_SIZE * 0.999372885712, CHAMFER_5_SIZE * 0.0354095369137), (-CHAMFER_5_SIZE_2 * 0.0354095369165, CHAMFER_5_SIZE_2 * 0.999372885791), (0, 0), align=None)
    extrude(amount=13.486531933, mode=Mode.SUBTRACT)

    # 倒角6
    # the kernel refuses this chamfer: 2.383507185, 2 mm, written as the material it takes off along each edge
    with BuildSketch(Plane(origin=(-31.7, 7.343265966, 0), x_dir=(0.9993728857116148, 0, 0.03540953691366311), z_dir=(0, -1, 0))) as chamfer_6_piece_1:
        Polygon((CHAMFER_6_SIZE * 0.999372885712, -CHAMFER_6_SIZE * 0.0354095369137), (-CHAMFER_6_SIZE_2 * 0.0354095369165, -CHAMFER_6_SIZE_2 * 0.999372885791), (0, 0), align=None)
    extrude(amount=13.486531933, mode=Mode.SUBTRACT)


solid = part.part
